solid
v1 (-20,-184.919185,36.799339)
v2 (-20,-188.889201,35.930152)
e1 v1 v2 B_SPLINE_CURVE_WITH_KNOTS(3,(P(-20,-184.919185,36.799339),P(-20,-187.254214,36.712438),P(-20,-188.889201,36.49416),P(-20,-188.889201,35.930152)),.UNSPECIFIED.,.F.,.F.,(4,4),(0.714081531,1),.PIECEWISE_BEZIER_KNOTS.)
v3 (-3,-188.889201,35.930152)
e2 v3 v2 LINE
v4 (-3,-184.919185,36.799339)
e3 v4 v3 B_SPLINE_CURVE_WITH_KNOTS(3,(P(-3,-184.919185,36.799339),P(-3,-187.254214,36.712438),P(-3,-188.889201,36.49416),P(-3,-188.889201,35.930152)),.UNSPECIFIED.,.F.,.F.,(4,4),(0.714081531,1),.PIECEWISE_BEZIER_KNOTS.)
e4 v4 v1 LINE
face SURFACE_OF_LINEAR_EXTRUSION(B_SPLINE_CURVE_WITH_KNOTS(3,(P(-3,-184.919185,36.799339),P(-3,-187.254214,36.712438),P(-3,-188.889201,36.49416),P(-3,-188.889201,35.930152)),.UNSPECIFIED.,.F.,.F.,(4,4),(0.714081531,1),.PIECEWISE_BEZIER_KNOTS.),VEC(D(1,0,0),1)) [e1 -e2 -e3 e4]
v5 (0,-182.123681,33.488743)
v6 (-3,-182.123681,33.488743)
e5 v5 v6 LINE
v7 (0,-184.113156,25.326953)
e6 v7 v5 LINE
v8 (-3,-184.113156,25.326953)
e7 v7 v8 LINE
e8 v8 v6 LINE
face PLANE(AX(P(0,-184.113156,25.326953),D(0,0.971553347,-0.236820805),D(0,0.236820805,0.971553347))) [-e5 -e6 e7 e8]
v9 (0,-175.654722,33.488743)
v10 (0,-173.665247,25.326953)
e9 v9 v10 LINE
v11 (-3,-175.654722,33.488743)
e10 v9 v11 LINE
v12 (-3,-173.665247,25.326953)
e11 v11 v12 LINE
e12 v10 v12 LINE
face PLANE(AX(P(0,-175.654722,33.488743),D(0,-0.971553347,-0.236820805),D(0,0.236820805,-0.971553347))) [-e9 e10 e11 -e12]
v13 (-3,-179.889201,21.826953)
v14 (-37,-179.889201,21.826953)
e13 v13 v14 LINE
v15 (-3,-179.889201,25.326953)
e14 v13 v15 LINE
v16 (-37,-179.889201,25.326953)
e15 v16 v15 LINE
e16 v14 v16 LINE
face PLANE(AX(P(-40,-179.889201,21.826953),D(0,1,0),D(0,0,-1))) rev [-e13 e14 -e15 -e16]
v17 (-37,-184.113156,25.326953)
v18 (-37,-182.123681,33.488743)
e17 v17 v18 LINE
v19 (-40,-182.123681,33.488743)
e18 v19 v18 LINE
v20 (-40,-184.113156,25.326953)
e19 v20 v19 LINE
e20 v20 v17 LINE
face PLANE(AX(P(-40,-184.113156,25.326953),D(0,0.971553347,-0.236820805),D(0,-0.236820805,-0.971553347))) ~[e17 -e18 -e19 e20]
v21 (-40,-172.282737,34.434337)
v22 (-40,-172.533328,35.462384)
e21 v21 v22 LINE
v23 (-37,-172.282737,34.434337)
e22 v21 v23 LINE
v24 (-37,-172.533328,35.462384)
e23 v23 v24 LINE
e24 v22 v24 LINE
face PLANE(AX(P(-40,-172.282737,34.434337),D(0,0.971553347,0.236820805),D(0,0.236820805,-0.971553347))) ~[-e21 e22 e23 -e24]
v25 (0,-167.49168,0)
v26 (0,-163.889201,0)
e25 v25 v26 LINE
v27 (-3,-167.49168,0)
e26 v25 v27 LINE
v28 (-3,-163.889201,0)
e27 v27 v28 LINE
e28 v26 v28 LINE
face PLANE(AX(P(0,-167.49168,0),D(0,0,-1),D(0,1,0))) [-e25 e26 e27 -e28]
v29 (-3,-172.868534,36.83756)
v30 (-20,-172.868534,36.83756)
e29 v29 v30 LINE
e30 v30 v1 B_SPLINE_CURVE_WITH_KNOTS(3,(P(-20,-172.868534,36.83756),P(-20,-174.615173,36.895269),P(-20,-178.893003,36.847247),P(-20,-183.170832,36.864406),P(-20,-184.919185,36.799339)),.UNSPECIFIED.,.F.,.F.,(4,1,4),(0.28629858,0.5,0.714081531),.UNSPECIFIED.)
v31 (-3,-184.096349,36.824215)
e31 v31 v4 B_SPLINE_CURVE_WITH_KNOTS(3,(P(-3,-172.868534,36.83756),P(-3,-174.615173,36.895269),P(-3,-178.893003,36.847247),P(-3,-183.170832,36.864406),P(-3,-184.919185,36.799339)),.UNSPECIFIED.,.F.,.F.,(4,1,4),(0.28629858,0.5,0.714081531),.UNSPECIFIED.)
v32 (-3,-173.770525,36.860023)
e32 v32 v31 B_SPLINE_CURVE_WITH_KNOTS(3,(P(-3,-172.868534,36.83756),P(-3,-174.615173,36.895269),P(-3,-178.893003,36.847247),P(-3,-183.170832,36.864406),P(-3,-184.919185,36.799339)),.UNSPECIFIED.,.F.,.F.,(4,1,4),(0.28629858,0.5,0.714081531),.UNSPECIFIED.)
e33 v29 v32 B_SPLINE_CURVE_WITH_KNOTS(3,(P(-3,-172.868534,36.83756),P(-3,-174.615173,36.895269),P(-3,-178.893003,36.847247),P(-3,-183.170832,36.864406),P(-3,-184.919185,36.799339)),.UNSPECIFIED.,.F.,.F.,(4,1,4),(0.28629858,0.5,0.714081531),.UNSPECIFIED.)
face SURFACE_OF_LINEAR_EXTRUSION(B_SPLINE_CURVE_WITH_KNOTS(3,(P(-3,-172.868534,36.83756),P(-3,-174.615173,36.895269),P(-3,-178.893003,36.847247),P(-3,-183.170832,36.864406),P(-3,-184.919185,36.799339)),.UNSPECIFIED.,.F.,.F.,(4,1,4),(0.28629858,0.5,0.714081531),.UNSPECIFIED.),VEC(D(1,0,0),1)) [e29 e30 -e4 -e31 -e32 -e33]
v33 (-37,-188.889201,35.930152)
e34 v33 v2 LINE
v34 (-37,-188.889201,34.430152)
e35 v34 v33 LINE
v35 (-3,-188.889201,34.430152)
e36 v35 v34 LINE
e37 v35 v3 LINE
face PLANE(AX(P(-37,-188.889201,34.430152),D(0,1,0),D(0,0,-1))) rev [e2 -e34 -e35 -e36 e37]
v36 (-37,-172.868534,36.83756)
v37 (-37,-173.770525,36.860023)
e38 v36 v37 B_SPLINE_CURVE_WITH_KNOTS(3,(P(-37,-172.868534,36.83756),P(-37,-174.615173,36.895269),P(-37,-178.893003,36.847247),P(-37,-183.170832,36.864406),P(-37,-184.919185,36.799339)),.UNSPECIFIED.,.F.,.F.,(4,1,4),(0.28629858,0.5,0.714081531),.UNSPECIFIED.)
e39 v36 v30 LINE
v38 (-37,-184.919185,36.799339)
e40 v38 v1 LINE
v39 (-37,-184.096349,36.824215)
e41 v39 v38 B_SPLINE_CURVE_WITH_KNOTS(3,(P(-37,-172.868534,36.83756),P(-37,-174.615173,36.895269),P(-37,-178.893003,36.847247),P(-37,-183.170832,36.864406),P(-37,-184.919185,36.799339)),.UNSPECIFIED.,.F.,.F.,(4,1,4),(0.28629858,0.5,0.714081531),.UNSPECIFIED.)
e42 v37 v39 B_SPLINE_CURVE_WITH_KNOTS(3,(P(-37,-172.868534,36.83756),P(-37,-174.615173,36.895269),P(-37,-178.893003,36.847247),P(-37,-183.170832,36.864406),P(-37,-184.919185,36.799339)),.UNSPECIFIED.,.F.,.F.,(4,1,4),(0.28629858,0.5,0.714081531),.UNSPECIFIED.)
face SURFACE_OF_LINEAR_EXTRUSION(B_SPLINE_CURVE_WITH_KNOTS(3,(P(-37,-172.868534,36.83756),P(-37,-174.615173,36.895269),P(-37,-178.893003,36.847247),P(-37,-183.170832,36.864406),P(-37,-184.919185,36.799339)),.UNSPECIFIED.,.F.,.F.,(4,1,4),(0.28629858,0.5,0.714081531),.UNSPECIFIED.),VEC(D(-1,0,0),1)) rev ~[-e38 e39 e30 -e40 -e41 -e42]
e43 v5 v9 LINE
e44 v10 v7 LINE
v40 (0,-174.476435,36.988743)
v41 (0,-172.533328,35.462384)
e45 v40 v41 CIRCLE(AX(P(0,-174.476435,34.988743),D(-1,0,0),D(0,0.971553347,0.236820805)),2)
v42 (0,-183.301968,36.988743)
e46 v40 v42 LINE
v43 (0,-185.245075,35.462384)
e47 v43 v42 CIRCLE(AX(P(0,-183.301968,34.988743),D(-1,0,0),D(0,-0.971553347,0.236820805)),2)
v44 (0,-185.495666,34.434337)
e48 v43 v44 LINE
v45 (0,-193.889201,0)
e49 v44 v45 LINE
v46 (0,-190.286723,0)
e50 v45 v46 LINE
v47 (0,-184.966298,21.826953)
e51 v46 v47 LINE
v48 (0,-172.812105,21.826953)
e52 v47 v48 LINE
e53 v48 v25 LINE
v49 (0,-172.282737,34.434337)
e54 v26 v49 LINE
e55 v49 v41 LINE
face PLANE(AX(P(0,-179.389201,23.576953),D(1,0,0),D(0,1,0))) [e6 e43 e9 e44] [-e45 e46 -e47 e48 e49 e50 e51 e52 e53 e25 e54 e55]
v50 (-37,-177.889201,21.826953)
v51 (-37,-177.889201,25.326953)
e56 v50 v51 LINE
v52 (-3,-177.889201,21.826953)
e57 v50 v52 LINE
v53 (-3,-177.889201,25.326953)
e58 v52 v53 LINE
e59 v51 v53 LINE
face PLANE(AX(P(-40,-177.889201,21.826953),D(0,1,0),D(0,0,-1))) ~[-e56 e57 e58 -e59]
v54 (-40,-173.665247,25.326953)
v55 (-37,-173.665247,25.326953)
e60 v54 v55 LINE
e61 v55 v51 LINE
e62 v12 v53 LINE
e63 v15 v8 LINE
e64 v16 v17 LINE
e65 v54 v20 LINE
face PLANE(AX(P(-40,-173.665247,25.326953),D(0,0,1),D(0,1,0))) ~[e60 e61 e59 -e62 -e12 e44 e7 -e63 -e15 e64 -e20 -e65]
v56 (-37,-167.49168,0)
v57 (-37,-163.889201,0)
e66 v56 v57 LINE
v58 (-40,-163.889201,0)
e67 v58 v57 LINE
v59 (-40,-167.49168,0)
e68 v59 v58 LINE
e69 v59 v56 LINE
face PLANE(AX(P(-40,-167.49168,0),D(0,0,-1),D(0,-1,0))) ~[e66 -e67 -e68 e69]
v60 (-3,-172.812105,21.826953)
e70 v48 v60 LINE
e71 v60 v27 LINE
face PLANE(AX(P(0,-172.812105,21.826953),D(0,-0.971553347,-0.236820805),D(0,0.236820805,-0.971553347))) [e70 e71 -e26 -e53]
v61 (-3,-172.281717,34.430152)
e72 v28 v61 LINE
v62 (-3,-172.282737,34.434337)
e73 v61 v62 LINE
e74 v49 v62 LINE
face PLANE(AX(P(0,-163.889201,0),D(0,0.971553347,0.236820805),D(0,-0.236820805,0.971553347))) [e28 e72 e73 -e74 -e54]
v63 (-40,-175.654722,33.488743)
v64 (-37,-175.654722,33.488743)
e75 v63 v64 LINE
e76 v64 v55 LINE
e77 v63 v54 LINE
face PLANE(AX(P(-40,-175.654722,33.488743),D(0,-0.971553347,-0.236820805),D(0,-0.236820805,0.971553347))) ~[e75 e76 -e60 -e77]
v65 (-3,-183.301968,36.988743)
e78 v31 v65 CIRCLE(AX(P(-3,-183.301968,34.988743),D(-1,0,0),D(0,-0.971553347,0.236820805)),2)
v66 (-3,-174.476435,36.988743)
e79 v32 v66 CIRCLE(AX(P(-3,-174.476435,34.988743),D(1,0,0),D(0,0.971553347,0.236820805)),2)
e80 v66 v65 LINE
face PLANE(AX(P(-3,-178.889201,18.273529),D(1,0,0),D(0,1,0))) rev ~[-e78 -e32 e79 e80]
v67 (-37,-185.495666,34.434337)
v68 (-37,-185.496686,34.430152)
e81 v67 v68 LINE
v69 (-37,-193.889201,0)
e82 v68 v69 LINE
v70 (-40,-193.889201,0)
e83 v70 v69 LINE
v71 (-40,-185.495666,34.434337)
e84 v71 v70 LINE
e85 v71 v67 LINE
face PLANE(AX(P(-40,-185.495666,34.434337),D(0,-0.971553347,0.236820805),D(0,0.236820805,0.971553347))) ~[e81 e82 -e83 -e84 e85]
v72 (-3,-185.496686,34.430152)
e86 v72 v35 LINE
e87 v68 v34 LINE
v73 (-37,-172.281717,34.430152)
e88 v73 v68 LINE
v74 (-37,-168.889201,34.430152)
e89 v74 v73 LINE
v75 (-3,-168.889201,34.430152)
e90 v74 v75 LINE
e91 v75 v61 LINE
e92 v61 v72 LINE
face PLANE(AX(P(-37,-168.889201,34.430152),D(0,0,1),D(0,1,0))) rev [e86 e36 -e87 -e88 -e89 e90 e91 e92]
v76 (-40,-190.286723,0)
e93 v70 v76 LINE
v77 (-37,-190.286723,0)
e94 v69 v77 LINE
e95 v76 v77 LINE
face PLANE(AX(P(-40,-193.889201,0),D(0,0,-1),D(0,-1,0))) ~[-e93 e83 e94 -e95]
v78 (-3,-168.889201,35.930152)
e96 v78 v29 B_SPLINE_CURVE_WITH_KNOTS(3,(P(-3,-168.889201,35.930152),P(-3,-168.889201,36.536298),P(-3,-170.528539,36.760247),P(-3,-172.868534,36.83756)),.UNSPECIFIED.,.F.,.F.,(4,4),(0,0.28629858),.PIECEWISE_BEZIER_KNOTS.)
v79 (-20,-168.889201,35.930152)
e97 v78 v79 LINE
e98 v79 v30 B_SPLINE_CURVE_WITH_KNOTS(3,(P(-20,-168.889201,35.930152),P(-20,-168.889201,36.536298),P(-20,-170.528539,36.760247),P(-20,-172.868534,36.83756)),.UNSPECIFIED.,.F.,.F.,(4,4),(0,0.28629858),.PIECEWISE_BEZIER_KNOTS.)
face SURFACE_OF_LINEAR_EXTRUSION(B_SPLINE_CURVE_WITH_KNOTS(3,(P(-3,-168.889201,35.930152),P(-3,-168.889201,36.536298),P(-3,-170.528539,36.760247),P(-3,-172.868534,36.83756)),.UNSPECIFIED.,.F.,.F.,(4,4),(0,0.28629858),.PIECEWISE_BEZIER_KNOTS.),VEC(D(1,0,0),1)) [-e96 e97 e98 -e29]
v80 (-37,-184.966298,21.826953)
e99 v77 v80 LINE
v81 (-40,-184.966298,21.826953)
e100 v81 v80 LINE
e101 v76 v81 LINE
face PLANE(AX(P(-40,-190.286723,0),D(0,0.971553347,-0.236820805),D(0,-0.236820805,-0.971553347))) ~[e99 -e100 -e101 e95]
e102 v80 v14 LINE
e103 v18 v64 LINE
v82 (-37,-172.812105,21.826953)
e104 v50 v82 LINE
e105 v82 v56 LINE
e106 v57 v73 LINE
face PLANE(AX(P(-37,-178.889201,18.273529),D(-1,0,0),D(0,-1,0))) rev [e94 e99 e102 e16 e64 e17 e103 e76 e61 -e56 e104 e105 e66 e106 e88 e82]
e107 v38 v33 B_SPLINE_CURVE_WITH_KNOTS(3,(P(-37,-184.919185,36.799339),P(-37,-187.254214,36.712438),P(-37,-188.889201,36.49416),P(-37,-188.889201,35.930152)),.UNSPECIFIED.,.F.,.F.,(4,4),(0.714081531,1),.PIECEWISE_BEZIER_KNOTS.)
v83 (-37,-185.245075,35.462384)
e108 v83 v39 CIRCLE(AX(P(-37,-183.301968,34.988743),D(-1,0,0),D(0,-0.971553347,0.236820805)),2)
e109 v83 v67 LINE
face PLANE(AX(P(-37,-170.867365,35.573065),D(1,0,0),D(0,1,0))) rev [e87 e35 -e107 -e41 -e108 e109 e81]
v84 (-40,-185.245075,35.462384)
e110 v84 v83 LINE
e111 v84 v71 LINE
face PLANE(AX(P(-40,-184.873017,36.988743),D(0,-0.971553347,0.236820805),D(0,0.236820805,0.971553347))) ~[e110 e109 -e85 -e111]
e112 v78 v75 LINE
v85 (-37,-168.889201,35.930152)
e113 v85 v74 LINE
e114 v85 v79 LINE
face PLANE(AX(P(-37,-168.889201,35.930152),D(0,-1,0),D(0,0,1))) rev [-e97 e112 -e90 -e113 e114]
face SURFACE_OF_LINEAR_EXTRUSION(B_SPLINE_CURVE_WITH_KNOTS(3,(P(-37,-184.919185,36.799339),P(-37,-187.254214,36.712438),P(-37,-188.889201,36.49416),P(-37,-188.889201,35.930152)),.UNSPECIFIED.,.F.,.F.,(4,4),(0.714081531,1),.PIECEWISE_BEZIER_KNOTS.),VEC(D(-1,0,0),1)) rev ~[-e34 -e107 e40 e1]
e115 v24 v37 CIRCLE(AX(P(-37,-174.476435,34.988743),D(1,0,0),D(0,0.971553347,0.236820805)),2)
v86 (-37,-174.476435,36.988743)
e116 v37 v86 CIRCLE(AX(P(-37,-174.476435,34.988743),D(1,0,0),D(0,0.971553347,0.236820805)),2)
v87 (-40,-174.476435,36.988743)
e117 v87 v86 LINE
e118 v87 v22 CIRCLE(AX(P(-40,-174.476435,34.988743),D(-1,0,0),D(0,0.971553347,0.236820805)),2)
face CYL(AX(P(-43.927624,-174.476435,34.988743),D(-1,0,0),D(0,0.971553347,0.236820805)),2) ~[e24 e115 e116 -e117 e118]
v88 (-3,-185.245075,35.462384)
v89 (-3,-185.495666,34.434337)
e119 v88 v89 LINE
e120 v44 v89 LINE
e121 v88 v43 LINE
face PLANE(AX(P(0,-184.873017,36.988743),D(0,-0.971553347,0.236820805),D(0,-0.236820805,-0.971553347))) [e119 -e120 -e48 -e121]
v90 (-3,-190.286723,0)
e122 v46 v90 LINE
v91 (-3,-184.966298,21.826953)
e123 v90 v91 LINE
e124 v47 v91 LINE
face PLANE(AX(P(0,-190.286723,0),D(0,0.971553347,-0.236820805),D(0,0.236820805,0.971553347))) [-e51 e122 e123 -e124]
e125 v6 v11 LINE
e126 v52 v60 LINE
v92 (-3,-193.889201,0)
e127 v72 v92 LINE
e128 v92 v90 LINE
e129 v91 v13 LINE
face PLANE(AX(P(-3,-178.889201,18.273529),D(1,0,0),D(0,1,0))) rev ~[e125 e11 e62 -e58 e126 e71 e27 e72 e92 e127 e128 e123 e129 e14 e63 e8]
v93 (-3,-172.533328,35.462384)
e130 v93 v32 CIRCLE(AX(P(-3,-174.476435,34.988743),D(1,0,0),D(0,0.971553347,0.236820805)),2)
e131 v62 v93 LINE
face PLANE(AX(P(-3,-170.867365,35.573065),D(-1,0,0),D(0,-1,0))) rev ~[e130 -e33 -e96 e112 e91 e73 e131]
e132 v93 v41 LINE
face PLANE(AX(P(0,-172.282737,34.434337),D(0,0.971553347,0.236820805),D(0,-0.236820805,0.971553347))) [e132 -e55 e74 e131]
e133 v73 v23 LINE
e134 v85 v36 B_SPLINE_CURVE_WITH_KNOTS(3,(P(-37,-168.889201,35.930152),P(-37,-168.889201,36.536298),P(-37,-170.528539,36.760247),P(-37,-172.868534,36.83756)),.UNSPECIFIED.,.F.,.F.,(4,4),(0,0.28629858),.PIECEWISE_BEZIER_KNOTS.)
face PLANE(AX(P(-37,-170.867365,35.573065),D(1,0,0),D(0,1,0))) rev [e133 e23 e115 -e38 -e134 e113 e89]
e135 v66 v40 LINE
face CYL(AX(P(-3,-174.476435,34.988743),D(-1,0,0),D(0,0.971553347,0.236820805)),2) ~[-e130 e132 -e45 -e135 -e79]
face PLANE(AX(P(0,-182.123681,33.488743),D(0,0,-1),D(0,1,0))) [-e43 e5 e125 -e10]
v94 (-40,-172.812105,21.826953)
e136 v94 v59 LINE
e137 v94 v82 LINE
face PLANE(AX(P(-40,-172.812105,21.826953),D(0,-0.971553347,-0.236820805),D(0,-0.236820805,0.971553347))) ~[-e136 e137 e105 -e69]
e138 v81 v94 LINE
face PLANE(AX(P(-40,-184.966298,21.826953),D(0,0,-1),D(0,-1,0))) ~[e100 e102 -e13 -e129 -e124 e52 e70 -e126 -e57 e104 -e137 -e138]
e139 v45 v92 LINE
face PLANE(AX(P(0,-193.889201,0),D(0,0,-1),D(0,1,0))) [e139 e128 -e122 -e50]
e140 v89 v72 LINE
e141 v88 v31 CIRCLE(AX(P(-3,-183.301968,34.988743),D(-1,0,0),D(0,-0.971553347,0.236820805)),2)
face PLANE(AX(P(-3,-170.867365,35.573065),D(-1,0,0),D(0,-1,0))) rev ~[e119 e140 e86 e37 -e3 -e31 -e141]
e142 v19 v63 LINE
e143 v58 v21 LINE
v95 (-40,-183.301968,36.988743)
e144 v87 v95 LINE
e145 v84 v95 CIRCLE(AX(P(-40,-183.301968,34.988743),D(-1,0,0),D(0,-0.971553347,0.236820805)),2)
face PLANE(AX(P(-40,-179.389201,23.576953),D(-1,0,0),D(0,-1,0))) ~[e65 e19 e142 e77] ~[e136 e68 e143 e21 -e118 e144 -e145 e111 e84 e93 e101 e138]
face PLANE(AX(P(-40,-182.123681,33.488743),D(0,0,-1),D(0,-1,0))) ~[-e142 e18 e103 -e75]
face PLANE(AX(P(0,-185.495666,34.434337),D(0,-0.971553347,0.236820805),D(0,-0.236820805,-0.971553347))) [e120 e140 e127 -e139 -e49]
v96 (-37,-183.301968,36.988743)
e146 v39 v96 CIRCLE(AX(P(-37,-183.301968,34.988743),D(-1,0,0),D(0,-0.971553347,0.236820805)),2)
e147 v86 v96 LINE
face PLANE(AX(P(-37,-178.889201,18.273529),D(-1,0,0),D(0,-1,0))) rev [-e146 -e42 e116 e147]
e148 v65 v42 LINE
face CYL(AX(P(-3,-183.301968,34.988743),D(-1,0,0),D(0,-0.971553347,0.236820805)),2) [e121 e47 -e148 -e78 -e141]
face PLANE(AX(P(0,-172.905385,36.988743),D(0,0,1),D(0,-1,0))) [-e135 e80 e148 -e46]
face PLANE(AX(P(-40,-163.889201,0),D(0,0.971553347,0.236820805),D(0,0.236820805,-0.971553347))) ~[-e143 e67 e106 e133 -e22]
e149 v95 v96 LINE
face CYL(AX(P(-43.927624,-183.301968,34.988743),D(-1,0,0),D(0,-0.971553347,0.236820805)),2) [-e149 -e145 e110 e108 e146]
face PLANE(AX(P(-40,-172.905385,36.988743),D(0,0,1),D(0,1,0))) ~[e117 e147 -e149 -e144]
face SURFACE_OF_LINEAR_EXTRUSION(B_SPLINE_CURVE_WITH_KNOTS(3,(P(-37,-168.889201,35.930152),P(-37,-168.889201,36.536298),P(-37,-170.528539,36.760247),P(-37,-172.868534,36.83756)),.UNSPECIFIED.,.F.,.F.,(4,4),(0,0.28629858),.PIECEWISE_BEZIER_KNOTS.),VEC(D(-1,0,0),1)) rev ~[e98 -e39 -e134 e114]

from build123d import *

# Parameters (mm, degrees)
F0_W        = 1
F0_H        = 3.5
F1_DEPTH    = 3
F2_DEPTH    = 20
F4_DEPTH    = 17
F6_T1_DEPTH = 6.9276237231
F6_T3_DEPTH = 6.9276237231


# Not quite as in the source:
# - a fillet or chamfer that OpenCascade refuses, or shapes differently, is made with other operations: its cross-section is extruded or revolved along the edge and cut away or added


with BuildPart() as f1:
    # F0 (on Right) → F1 (new body)
    with BuildSketch(Plane.YZ):
        Polygon((-185.4956659779, 34.4343371689), (-193.88920142, 0), (-190.2867229659, 0), (-184.9662980764, 21.8269531103), (-184.1131562284, 25.3269531103), (-182.1236807397, 33.4887426496), (-178.88920142, 33.4887426496), (-175.6547221004, 33.4887426496), (-173.6652466117, 25.3269531103), (-172.8121047636, 21.8269531103), (-167.4916798742, 0), (-163.88920142, 0), (-172.2827368621, 34.4343371689), (-178.88920142, 34.4343371689), align=None)
        Polygon((-184.8730173458, 36.9887426496), (-185.4956659779, 34.4343371689), (-178.88920142, 34.4343371689), (-172.2827368621, 34.4343371689), (-172.9053854942, 36.9887426496), (-178.88920142, 36.9887426496), align=None)
        Polygon((-184.1131562284, 25.3269531103), (-184.9662980764, 21.8269531103), (-179.88920142, 21.8269531103), (-179.88920142, 25.3269531103), align=None)
        with Locations((-178.38920142, 23.5769531103)):
            Rectangle(F0_W, F0_H)
        with Locations((-179.38920142, 23.5769531103)):
            Rectangle(F0_W, F0_H)
        Polygon((-177.88920142, 21.8269531103), (-172.8121047636, 21.8269531103), (-173.6652466117, 25.3269531103), (-177.88920142, 25.3269531103), align=None)
    extrude(amount=-F1_DEPTH)

    # F0 (on Right) → F2 (join)
    with BuildSketch(Plane.YZ):
        with Locations((-179.38920142, 23.5769531103)):
            Rectangle(F0_W, F0_H)
        with Locations((-178.38920142, 23.5769531103)):
            Rectangle(F0_W, F0_H)
    extrude(amount=-F2_DEPTH)

    # F3 (on face) → F4 (join, through all)
    with BuildSketch(Plane(origin=(-3, 0, 0), x_dir=(0, -1, 0), z_dir=(-1, 0, 0))):
        with BuildLine():
            Line((168.88920142, 34.4301523733), (172.2817167981, 34.4301523733))
            Line((172.2817167981, 34.4301523733), (172.8685340256, 36.8375601227))
            add(Edge.make_bspline(
                [(168.88920142, 35.9301523733), (168.88920142, 36.5362981599), (170.5285389627, 36.7602466997), (172.8685340256, 36.8375601227)],
                knots=[0, 0, 0, 0, 0.2862985804, 0.2862985804, 0.2862985804, 0.2862985804], degree=3))
            Line((168.88920142, 35.9301523733), (168.88920142, 34.4301523733))
        make_face()
        with BuildLine():
            Line((184.9191853663, 36.7993391266), (185.496686042, 34.4301523733))
            Line((185.496686042, 34.4301523733), (188.88920142, 34.4301523733))
            Line((188.88920142, 34.4301523733), (188.88920142, 35.9301523733))
            add(Edge.make_bspline(
                [(184.9191853663, 36.7993391266), (187.2542140028, 36.7124384565), (188.88920142, 36.4941599471), (188.88920142, 35.9301523733)],
                knots=[0.7140815311, 0.7140815311, 0.7140815311, 0.7140815311, 1, 1, 1, 1], degree=3))
        make_face()
        with BuildLine():
            Line((172.2817167981, 34.4301523733), (178.88920142, 34.4301523733))
            Line((178.88920142, 34.4301523733), (185.496686042, 34.4301523733))
            Line((185.496686042, 34.4301523733), (184.9191853663, 36.7993391266))
            add(Edge.make_bspline(
                [(172.8685340256, 36.8375601227), (174.6151730279, 36.895269065), (178.8930025349, 36.8472471546), (183.1708320419, 36.8644060269), (184.9191853663, 36.7993391266)],
                knots=[0.2862985804, 0.2862985804, 0.2862985804, 0.2862985804, 0.5, 0.7140815311, 0.7140815311, 0.7140815311, 0.7140815311], degree=3))
            Line((172.8685340256, 36.8375601227), (172.2817167981, 34.4301523733))
        make_face()
    extrude(amount=F4_DEPTH)

    # F5: F1 across face


with BuildPart() as f1_1:
    add(f1.part)
    add(f1.part.mirror(Plane(origin=(-20, -178.8538492179, 35.6039729667), x_dir=(0, -1, 0), z_dir=(-1, 0, 0))))

    # F6: fillet of radius 2 on 4 edges, made by hand

    # F6_s2 → F6_t1 (cut)
    with BuildSketch(Plane.YZ.offset(-3)):
        with BuildLine():
            ThreePointArc((-185.2450745508, 35.4623842598), (-184.5374266336, 36.561524138), (-183.3019678566, 36.9887426496))
            Line((-183.3019678566, 36.9887426496), (-184.8730173458, 36.9887426496))
            Line((-184.8730173458, 36.9887426496), (-185.2450745508, 35.4623842598))
        make_face()
        with BuildLine():
            ThreePointArc((-172.5333282893, 35.4623842598), (-173.2409762064, 36.561524138), (-174.4764349835, 36.9887426496))
            Line((-174.4764349835, 36.9887426496), (-172.9053854942, 36.9887426496))
            Line((-172.9053854942, 36.9887426496), (-172.5333282893, 35.4623842598))
        make_face()
    extrude(amount=F6_T1_DEPTH, mode=Mode.SUBTRACT)

    # F6_s4 → F6_t3 (cut)
    with BuildSketch(Plane.YZ.offset(-43.9276237231)):
        with BuildLine():
            ThreePointArc((-185.2450745508, 35.4623842598), (-184.5374266336, 36.561524138), (-183.3019678566, 36.9887426496))
            Line((-183.3019678566, 36.9887426496), (-184.8730173458, 36.9887426496))
            Line((-184.8730173458, 36.9887426496), (-185.2450745508, 35.4623842598))
        make_face()
        with BuildLine():
            ThreePointArc((-172.5333282893, 35.4623842598), (-173.2409762064, 36.561524138), (-174.4764349835, 36.9887426496))
            Line((-174.4764349835, 36.9887426496), (-172.9053854942, 36.9887426496))
            Line((-172.9053854942, 36.9887426496), (-172.5333282893, 35.4623842598))
        make_face()
    extrude(amount=F6_T3_DEPTH, mode=Mode.SUBTRACT)


solid = f1_1.part
